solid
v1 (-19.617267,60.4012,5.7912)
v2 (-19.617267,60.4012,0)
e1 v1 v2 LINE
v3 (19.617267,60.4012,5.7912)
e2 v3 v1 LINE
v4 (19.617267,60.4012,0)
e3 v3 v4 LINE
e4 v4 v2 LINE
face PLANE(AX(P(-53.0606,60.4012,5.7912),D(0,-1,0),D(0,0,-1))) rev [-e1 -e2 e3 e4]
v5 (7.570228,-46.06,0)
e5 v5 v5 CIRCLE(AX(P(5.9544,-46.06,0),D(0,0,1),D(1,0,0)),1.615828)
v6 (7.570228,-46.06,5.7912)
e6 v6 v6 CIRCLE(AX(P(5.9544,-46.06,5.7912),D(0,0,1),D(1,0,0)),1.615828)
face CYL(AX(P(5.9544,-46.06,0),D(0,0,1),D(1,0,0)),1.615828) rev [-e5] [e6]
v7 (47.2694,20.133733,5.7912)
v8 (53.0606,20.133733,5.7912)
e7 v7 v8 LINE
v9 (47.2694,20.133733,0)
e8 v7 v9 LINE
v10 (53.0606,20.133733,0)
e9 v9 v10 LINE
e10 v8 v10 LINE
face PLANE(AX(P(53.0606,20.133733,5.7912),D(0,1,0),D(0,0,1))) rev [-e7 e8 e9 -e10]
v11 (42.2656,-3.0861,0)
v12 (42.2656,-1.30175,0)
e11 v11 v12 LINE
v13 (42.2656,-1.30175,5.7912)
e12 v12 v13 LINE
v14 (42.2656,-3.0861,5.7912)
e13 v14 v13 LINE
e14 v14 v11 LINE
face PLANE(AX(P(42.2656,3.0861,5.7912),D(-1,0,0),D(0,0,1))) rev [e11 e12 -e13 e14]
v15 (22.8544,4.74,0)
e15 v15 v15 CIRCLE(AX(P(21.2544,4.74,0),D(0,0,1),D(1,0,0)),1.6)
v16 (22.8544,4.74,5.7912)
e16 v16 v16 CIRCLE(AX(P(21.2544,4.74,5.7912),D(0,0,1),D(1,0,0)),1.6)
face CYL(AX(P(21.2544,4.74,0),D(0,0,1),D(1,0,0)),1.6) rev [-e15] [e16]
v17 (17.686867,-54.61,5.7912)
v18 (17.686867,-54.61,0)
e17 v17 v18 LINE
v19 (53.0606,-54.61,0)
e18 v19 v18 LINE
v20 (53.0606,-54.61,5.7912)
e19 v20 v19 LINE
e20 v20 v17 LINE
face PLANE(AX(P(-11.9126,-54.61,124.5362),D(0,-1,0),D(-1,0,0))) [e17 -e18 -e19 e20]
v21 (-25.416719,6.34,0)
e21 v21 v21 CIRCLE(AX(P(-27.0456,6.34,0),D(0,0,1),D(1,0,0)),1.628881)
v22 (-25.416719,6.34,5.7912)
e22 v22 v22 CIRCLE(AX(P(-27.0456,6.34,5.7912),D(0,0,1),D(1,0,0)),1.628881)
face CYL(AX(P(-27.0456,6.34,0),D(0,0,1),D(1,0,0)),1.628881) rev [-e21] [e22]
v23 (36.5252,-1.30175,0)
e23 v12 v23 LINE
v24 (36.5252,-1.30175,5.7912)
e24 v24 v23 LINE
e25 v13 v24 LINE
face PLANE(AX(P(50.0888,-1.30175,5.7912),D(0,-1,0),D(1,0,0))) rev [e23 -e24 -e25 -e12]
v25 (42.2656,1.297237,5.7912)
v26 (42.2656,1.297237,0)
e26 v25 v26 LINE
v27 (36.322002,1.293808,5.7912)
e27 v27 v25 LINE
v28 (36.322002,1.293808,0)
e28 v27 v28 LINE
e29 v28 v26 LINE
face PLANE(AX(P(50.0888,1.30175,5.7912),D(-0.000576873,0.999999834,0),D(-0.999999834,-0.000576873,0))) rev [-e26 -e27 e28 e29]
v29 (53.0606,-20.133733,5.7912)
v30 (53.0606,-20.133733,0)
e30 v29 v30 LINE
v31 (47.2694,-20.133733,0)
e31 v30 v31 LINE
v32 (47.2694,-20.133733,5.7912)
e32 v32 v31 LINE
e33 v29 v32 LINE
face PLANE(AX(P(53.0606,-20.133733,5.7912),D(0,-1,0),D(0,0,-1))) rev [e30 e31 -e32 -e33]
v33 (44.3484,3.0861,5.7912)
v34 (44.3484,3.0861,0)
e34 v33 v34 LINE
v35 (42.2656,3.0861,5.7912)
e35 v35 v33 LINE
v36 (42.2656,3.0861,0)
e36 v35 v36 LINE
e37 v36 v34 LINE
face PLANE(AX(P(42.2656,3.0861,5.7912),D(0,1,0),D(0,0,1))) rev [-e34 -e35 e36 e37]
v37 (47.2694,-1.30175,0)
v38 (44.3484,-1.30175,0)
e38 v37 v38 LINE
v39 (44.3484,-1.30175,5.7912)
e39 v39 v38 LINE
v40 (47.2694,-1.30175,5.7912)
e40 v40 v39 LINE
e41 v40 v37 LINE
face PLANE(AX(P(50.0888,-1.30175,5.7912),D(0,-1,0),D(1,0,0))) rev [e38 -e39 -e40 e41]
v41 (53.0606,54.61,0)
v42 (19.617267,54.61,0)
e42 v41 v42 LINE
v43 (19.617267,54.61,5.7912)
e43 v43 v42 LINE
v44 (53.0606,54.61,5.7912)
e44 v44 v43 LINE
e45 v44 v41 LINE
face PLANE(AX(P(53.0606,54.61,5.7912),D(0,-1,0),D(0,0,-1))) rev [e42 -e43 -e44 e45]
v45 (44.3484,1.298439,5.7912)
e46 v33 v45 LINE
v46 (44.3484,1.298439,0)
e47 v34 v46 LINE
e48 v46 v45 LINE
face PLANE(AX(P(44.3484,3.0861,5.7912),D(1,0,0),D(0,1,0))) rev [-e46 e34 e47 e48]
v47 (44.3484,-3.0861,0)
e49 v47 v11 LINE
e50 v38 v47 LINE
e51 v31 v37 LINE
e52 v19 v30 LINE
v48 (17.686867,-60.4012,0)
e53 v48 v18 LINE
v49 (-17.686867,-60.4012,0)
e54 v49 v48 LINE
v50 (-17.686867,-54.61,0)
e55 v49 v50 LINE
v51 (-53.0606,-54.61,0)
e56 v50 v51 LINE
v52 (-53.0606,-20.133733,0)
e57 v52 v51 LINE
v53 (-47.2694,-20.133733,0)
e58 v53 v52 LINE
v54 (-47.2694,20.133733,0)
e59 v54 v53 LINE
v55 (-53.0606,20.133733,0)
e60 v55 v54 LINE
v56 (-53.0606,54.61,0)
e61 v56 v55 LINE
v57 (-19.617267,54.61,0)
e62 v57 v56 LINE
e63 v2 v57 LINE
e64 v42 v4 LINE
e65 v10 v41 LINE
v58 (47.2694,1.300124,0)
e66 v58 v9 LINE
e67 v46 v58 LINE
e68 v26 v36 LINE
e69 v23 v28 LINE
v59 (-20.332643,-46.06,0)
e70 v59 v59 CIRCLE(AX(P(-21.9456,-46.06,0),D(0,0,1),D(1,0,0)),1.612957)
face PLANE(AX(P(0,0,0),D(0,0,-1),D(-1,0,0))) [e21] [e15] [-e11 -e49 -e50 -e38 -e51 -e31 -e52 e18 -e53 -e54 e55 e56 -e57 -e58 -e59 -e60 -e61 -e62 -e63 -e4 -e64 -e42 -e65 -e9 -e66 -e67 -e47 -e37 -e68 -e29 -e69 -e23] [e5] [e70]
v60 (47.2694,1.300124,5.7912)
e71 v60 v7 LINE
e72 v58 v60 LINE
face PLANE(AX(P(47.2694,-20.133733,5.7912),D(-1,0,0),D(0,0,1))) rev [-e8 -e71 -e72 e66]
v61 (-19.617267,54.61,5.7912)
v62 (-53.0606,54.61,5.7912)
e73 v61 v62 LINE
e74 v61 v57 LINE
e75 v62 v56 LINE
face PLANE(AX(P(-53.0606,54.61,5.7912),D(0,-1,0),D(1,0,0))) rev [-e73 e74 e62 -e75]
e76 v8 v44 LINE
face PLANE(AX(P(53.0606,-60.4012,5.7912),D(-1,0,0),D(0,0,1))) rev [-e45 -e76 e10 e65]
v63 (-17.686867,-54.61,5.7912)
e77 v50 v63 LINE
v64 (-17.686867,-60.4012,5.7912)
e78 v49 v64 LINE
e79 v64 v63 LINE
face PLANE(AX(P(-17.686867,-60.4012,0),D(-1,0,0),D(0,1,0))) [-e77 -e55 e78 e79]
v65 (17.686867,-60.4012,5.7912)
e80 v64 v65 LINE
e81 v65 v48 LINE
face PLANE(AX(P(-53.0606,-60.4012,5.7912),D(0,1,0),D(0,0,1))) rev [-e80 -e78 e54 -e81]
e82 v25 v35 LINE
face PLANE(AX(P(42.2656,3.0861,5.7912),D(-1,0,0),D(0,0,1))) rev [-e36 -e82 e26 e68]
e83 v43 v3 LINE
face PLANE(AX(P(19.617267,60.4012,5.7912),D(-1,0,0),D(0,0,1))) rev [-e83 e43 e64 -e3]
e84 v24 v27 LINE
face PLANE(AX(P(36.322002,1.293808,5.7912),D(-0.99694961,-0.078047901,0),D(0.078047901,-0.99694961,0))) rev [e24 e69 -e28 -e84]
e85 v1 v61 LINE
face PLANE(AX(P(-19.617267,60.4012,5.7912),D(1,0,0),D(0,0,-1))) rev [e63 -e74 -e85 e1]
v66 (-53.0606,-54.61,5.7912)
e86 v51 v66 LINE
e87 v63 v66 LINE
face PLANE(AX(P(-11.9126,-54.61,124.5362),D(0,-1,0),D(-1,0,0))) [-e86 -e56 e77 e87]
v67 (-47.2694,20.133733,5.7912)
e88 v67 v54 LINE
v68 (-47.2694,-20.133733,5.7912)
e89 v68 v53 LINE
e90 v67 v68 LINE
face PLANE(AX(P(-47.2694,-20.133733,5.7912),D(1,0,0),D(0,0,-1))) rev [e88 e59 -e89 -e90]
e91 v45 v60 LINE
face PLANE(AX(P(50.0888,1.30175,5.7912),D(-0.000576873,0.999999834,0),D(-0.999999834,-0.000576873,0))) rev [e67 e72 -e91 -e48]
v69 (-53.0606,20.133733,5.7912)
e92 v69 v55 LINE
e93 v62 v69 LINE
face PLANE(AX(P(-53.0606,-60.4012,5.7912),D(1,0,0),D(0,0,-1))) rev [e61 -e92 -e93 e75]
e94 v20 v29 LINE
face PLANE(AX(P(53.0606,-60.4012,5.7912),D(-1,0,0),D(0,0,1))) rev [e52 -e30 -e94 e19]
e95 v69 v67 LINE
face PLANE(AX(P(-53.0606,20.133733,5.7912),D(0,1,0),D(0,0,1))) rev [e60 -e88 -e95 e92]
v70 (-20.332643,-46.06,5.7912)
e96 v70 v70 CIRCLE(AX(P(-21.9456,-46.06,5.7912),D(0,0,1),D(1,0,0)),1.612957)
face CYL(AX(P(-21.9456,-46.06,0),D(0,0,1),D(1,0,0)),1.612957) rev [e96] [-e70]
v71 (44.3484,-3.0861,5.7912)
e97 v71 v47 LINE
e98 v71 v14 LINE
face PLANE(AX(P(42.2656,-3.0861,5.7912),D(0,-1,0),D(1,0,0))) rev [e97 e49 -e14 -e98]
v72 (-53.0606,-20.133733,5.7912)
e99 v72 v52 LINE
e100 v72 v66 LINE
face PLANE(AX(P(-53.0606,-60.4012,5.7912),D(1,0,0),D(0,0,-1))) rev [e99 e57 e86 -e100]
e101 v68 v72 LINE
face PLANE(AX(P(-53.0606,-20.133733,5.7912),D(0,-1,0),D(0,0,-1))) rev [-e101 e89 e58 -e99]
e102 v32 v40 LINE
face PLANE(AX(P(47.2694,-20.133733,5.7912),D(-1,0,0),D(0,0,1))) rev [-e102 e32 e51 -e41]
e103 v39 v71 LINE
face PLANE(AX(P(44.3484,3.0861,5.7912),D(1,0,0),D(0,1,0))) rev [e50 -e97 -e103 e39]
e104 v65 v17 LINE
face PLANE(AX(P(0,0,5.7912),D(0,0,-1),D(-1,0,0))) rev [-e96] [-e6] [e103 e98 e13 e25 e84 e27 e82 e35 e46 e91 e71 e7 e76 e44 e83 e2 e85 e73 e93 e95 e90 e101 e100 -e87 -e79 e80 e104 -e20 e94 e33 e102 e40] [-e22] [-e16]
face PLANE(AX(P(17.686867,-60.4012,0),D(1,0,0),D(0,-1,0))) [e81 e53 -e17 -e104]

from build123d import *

# Parameters (mm, degrees)
SKETCH1_W           = 106.1212
SKETCH1_H           = 120.8024
BOSS_EXTRUDE1_DEPTH = 5.7912
CAVITY2_START       = -53.0606
CAVITY2_OUTLINE_W   = 5.7912
CAVITY2_OUTLINE_H   = 5.7912
CAVITY2_DEPTH       = 35.373733333
CAVITY2_START_2     = 17.686866667
CAVITY2_2_OUTLINE_W = 5.7912
CAVITY2_2_OUTLINE_H = 5.7912
CAVITY2_2_DEPTH     = 35.373733333
SKETCH6_W           = 33.443333333
SKETCH6_H           = 5.7912
CUT_EXTRUDE4_DEPTH  = 81.605646398
SKETCH4_W           = 2.0828
SKETCH4_H           = 6.1722
CUT_EXTRUDE5_DEPTH  = 81.605646398
CUT_EXTRUDE6_DEPTH  = 81.605646398
SKETCH2_W           = 5.7912
SKETCH2_H           = 40.267466666
CUT_EXTRUDE7_DEPTH  = 81.605646398
SKETCH7_R           = 1.615828467
SKETCH7_R_2         = 1.628881449
SKETCH7_R_3         = 1.612957286
SKETCH7_R_4         = 1.6
CUT_EXTRUDE8_DEPTH  = 81.605646398


# Read off the part's stored shape, not the designer's step: Cavity2
with BuildPart() as part:
    # Sketch1 → Boss-Extrude1 (new body)
    with BuildSketch(Plane.XY):
        Rectangle(SKETCH1_W, SKETCH1_H)
    extrude(amount=BOSS_EXTRUDE1_DEPTH)

    # Cavity2 outline → Cavity2 (cut)
    with BuildSketch(Plane.YZ.offset(CAVITY2_START)):
        with Locations((-57.5056, 2.8956)):
            Rectangle(CAVITY2_OUTLINE_W, CAVITY2_OUTLINE_H)
    extrude(amount=CAVITY2_DEPTH, mode=Mode.SUBTRACT)

    # Cavity2 2 outline → Cavity2 2 (cut)
    with BuildSketch(Plane.YZ.offset(CAVITY2_START_2)):
        with Locations((-57.5056, 2.8956)):
            Rectangle(CAVITY2_2_OUTLINE_W, CAVITY2_2_OUTLINE_H)
    extrude(amount=CAVITY2_2_DEPTH, mode=Mode.SUBTRACT)

    # Sketch6 → Cut-Extrude4 (cut, through all)
    with BuildSketch(Plane(origin=(0, 0, 0), x_dir=(-1, 0, 0), z_dir=(0, 0, -1))):
        with Locations((-36.338933334, 57.5056)):
            Rectangle(SKETCH6_W, SKETCH6_H)
        with Locations((36.338933334, 57.5056)):
            Rectangle(SKETCH6_W, SKETCH6_H)
    extrude(amount=-CUT_EXTRUDE4_DEPTH, mode=Mode.SUBTRACT)

    # Sketch4 → Cut-Extrude5 (cut, through all)
    with BuildSketch(Plane(origin=(0, 0, 0), x_dir=(-1, 0, 0), z_dir=(0, 0, -1))):
        with Locations((-43.307, 0)):
            Rectangle(SKETCH4_W, SKETCH4_H)
    extrude(amount=-CUT_EXTRUDE5_DEPTH, mode=Mode.SUBTRACT)

    # Sketch3 → Cut-Extrude6 (cut, through all)
    with BuildSketch(Plane(origin=(0, 0, 0), x_dir=(-1, 0, 0), z_dir=(0, 0, -1))):
        Polygon((-50.0888, 1.30175), (-50.0888, -1.30175), (-36.5252, -1.30175), (-36.322002291, 1.29380831), align=None)
    extrude(amount=-CUT_EXTRUDE6_DEPTH, mode=Mode.SUBTRACT)

    # Sketch2 → Cut-Extrude7 (cut, through all)
    with BuildSketch(Plane(origin=(0, 0, 0), x_dir=(-1, 0, 0), z_dir=(0, 0, -1))):
        with Locations((-50.165, 0)):
            Rectangle(SKETCH2_W, SKETCH2_H)
        with Locations((50.165, 0)):
            Rectangle(SKETCH2_W, SKETCH2_H)
    extrude(amount=-CUT_EXTRUDE7_DEPTH, mode=Mode.SUBTRACT)

    # Sketch7 → Cut-Extrude8 (cut, through all)
    with BuildSketch(Plane.XY.offset(5.7912)):
        with Locations((5.9544, -46.06)):
            Circle(SKETCH7_R)
        with Locations((-27.0456, 6.34)):
            Circle(SKETCH7_R_2)
        with Locations((-21.9456, -46.06)):
            Circle(SKETCH7_R_3)
        with Locations((21.2544, 4.74)):
            Circle(SKETCH7_R_4)
    extrude(amount=-CUT_EXTRUDE8_DEPTH, mode=Mode.SUBTRACT)


solid = part.part
